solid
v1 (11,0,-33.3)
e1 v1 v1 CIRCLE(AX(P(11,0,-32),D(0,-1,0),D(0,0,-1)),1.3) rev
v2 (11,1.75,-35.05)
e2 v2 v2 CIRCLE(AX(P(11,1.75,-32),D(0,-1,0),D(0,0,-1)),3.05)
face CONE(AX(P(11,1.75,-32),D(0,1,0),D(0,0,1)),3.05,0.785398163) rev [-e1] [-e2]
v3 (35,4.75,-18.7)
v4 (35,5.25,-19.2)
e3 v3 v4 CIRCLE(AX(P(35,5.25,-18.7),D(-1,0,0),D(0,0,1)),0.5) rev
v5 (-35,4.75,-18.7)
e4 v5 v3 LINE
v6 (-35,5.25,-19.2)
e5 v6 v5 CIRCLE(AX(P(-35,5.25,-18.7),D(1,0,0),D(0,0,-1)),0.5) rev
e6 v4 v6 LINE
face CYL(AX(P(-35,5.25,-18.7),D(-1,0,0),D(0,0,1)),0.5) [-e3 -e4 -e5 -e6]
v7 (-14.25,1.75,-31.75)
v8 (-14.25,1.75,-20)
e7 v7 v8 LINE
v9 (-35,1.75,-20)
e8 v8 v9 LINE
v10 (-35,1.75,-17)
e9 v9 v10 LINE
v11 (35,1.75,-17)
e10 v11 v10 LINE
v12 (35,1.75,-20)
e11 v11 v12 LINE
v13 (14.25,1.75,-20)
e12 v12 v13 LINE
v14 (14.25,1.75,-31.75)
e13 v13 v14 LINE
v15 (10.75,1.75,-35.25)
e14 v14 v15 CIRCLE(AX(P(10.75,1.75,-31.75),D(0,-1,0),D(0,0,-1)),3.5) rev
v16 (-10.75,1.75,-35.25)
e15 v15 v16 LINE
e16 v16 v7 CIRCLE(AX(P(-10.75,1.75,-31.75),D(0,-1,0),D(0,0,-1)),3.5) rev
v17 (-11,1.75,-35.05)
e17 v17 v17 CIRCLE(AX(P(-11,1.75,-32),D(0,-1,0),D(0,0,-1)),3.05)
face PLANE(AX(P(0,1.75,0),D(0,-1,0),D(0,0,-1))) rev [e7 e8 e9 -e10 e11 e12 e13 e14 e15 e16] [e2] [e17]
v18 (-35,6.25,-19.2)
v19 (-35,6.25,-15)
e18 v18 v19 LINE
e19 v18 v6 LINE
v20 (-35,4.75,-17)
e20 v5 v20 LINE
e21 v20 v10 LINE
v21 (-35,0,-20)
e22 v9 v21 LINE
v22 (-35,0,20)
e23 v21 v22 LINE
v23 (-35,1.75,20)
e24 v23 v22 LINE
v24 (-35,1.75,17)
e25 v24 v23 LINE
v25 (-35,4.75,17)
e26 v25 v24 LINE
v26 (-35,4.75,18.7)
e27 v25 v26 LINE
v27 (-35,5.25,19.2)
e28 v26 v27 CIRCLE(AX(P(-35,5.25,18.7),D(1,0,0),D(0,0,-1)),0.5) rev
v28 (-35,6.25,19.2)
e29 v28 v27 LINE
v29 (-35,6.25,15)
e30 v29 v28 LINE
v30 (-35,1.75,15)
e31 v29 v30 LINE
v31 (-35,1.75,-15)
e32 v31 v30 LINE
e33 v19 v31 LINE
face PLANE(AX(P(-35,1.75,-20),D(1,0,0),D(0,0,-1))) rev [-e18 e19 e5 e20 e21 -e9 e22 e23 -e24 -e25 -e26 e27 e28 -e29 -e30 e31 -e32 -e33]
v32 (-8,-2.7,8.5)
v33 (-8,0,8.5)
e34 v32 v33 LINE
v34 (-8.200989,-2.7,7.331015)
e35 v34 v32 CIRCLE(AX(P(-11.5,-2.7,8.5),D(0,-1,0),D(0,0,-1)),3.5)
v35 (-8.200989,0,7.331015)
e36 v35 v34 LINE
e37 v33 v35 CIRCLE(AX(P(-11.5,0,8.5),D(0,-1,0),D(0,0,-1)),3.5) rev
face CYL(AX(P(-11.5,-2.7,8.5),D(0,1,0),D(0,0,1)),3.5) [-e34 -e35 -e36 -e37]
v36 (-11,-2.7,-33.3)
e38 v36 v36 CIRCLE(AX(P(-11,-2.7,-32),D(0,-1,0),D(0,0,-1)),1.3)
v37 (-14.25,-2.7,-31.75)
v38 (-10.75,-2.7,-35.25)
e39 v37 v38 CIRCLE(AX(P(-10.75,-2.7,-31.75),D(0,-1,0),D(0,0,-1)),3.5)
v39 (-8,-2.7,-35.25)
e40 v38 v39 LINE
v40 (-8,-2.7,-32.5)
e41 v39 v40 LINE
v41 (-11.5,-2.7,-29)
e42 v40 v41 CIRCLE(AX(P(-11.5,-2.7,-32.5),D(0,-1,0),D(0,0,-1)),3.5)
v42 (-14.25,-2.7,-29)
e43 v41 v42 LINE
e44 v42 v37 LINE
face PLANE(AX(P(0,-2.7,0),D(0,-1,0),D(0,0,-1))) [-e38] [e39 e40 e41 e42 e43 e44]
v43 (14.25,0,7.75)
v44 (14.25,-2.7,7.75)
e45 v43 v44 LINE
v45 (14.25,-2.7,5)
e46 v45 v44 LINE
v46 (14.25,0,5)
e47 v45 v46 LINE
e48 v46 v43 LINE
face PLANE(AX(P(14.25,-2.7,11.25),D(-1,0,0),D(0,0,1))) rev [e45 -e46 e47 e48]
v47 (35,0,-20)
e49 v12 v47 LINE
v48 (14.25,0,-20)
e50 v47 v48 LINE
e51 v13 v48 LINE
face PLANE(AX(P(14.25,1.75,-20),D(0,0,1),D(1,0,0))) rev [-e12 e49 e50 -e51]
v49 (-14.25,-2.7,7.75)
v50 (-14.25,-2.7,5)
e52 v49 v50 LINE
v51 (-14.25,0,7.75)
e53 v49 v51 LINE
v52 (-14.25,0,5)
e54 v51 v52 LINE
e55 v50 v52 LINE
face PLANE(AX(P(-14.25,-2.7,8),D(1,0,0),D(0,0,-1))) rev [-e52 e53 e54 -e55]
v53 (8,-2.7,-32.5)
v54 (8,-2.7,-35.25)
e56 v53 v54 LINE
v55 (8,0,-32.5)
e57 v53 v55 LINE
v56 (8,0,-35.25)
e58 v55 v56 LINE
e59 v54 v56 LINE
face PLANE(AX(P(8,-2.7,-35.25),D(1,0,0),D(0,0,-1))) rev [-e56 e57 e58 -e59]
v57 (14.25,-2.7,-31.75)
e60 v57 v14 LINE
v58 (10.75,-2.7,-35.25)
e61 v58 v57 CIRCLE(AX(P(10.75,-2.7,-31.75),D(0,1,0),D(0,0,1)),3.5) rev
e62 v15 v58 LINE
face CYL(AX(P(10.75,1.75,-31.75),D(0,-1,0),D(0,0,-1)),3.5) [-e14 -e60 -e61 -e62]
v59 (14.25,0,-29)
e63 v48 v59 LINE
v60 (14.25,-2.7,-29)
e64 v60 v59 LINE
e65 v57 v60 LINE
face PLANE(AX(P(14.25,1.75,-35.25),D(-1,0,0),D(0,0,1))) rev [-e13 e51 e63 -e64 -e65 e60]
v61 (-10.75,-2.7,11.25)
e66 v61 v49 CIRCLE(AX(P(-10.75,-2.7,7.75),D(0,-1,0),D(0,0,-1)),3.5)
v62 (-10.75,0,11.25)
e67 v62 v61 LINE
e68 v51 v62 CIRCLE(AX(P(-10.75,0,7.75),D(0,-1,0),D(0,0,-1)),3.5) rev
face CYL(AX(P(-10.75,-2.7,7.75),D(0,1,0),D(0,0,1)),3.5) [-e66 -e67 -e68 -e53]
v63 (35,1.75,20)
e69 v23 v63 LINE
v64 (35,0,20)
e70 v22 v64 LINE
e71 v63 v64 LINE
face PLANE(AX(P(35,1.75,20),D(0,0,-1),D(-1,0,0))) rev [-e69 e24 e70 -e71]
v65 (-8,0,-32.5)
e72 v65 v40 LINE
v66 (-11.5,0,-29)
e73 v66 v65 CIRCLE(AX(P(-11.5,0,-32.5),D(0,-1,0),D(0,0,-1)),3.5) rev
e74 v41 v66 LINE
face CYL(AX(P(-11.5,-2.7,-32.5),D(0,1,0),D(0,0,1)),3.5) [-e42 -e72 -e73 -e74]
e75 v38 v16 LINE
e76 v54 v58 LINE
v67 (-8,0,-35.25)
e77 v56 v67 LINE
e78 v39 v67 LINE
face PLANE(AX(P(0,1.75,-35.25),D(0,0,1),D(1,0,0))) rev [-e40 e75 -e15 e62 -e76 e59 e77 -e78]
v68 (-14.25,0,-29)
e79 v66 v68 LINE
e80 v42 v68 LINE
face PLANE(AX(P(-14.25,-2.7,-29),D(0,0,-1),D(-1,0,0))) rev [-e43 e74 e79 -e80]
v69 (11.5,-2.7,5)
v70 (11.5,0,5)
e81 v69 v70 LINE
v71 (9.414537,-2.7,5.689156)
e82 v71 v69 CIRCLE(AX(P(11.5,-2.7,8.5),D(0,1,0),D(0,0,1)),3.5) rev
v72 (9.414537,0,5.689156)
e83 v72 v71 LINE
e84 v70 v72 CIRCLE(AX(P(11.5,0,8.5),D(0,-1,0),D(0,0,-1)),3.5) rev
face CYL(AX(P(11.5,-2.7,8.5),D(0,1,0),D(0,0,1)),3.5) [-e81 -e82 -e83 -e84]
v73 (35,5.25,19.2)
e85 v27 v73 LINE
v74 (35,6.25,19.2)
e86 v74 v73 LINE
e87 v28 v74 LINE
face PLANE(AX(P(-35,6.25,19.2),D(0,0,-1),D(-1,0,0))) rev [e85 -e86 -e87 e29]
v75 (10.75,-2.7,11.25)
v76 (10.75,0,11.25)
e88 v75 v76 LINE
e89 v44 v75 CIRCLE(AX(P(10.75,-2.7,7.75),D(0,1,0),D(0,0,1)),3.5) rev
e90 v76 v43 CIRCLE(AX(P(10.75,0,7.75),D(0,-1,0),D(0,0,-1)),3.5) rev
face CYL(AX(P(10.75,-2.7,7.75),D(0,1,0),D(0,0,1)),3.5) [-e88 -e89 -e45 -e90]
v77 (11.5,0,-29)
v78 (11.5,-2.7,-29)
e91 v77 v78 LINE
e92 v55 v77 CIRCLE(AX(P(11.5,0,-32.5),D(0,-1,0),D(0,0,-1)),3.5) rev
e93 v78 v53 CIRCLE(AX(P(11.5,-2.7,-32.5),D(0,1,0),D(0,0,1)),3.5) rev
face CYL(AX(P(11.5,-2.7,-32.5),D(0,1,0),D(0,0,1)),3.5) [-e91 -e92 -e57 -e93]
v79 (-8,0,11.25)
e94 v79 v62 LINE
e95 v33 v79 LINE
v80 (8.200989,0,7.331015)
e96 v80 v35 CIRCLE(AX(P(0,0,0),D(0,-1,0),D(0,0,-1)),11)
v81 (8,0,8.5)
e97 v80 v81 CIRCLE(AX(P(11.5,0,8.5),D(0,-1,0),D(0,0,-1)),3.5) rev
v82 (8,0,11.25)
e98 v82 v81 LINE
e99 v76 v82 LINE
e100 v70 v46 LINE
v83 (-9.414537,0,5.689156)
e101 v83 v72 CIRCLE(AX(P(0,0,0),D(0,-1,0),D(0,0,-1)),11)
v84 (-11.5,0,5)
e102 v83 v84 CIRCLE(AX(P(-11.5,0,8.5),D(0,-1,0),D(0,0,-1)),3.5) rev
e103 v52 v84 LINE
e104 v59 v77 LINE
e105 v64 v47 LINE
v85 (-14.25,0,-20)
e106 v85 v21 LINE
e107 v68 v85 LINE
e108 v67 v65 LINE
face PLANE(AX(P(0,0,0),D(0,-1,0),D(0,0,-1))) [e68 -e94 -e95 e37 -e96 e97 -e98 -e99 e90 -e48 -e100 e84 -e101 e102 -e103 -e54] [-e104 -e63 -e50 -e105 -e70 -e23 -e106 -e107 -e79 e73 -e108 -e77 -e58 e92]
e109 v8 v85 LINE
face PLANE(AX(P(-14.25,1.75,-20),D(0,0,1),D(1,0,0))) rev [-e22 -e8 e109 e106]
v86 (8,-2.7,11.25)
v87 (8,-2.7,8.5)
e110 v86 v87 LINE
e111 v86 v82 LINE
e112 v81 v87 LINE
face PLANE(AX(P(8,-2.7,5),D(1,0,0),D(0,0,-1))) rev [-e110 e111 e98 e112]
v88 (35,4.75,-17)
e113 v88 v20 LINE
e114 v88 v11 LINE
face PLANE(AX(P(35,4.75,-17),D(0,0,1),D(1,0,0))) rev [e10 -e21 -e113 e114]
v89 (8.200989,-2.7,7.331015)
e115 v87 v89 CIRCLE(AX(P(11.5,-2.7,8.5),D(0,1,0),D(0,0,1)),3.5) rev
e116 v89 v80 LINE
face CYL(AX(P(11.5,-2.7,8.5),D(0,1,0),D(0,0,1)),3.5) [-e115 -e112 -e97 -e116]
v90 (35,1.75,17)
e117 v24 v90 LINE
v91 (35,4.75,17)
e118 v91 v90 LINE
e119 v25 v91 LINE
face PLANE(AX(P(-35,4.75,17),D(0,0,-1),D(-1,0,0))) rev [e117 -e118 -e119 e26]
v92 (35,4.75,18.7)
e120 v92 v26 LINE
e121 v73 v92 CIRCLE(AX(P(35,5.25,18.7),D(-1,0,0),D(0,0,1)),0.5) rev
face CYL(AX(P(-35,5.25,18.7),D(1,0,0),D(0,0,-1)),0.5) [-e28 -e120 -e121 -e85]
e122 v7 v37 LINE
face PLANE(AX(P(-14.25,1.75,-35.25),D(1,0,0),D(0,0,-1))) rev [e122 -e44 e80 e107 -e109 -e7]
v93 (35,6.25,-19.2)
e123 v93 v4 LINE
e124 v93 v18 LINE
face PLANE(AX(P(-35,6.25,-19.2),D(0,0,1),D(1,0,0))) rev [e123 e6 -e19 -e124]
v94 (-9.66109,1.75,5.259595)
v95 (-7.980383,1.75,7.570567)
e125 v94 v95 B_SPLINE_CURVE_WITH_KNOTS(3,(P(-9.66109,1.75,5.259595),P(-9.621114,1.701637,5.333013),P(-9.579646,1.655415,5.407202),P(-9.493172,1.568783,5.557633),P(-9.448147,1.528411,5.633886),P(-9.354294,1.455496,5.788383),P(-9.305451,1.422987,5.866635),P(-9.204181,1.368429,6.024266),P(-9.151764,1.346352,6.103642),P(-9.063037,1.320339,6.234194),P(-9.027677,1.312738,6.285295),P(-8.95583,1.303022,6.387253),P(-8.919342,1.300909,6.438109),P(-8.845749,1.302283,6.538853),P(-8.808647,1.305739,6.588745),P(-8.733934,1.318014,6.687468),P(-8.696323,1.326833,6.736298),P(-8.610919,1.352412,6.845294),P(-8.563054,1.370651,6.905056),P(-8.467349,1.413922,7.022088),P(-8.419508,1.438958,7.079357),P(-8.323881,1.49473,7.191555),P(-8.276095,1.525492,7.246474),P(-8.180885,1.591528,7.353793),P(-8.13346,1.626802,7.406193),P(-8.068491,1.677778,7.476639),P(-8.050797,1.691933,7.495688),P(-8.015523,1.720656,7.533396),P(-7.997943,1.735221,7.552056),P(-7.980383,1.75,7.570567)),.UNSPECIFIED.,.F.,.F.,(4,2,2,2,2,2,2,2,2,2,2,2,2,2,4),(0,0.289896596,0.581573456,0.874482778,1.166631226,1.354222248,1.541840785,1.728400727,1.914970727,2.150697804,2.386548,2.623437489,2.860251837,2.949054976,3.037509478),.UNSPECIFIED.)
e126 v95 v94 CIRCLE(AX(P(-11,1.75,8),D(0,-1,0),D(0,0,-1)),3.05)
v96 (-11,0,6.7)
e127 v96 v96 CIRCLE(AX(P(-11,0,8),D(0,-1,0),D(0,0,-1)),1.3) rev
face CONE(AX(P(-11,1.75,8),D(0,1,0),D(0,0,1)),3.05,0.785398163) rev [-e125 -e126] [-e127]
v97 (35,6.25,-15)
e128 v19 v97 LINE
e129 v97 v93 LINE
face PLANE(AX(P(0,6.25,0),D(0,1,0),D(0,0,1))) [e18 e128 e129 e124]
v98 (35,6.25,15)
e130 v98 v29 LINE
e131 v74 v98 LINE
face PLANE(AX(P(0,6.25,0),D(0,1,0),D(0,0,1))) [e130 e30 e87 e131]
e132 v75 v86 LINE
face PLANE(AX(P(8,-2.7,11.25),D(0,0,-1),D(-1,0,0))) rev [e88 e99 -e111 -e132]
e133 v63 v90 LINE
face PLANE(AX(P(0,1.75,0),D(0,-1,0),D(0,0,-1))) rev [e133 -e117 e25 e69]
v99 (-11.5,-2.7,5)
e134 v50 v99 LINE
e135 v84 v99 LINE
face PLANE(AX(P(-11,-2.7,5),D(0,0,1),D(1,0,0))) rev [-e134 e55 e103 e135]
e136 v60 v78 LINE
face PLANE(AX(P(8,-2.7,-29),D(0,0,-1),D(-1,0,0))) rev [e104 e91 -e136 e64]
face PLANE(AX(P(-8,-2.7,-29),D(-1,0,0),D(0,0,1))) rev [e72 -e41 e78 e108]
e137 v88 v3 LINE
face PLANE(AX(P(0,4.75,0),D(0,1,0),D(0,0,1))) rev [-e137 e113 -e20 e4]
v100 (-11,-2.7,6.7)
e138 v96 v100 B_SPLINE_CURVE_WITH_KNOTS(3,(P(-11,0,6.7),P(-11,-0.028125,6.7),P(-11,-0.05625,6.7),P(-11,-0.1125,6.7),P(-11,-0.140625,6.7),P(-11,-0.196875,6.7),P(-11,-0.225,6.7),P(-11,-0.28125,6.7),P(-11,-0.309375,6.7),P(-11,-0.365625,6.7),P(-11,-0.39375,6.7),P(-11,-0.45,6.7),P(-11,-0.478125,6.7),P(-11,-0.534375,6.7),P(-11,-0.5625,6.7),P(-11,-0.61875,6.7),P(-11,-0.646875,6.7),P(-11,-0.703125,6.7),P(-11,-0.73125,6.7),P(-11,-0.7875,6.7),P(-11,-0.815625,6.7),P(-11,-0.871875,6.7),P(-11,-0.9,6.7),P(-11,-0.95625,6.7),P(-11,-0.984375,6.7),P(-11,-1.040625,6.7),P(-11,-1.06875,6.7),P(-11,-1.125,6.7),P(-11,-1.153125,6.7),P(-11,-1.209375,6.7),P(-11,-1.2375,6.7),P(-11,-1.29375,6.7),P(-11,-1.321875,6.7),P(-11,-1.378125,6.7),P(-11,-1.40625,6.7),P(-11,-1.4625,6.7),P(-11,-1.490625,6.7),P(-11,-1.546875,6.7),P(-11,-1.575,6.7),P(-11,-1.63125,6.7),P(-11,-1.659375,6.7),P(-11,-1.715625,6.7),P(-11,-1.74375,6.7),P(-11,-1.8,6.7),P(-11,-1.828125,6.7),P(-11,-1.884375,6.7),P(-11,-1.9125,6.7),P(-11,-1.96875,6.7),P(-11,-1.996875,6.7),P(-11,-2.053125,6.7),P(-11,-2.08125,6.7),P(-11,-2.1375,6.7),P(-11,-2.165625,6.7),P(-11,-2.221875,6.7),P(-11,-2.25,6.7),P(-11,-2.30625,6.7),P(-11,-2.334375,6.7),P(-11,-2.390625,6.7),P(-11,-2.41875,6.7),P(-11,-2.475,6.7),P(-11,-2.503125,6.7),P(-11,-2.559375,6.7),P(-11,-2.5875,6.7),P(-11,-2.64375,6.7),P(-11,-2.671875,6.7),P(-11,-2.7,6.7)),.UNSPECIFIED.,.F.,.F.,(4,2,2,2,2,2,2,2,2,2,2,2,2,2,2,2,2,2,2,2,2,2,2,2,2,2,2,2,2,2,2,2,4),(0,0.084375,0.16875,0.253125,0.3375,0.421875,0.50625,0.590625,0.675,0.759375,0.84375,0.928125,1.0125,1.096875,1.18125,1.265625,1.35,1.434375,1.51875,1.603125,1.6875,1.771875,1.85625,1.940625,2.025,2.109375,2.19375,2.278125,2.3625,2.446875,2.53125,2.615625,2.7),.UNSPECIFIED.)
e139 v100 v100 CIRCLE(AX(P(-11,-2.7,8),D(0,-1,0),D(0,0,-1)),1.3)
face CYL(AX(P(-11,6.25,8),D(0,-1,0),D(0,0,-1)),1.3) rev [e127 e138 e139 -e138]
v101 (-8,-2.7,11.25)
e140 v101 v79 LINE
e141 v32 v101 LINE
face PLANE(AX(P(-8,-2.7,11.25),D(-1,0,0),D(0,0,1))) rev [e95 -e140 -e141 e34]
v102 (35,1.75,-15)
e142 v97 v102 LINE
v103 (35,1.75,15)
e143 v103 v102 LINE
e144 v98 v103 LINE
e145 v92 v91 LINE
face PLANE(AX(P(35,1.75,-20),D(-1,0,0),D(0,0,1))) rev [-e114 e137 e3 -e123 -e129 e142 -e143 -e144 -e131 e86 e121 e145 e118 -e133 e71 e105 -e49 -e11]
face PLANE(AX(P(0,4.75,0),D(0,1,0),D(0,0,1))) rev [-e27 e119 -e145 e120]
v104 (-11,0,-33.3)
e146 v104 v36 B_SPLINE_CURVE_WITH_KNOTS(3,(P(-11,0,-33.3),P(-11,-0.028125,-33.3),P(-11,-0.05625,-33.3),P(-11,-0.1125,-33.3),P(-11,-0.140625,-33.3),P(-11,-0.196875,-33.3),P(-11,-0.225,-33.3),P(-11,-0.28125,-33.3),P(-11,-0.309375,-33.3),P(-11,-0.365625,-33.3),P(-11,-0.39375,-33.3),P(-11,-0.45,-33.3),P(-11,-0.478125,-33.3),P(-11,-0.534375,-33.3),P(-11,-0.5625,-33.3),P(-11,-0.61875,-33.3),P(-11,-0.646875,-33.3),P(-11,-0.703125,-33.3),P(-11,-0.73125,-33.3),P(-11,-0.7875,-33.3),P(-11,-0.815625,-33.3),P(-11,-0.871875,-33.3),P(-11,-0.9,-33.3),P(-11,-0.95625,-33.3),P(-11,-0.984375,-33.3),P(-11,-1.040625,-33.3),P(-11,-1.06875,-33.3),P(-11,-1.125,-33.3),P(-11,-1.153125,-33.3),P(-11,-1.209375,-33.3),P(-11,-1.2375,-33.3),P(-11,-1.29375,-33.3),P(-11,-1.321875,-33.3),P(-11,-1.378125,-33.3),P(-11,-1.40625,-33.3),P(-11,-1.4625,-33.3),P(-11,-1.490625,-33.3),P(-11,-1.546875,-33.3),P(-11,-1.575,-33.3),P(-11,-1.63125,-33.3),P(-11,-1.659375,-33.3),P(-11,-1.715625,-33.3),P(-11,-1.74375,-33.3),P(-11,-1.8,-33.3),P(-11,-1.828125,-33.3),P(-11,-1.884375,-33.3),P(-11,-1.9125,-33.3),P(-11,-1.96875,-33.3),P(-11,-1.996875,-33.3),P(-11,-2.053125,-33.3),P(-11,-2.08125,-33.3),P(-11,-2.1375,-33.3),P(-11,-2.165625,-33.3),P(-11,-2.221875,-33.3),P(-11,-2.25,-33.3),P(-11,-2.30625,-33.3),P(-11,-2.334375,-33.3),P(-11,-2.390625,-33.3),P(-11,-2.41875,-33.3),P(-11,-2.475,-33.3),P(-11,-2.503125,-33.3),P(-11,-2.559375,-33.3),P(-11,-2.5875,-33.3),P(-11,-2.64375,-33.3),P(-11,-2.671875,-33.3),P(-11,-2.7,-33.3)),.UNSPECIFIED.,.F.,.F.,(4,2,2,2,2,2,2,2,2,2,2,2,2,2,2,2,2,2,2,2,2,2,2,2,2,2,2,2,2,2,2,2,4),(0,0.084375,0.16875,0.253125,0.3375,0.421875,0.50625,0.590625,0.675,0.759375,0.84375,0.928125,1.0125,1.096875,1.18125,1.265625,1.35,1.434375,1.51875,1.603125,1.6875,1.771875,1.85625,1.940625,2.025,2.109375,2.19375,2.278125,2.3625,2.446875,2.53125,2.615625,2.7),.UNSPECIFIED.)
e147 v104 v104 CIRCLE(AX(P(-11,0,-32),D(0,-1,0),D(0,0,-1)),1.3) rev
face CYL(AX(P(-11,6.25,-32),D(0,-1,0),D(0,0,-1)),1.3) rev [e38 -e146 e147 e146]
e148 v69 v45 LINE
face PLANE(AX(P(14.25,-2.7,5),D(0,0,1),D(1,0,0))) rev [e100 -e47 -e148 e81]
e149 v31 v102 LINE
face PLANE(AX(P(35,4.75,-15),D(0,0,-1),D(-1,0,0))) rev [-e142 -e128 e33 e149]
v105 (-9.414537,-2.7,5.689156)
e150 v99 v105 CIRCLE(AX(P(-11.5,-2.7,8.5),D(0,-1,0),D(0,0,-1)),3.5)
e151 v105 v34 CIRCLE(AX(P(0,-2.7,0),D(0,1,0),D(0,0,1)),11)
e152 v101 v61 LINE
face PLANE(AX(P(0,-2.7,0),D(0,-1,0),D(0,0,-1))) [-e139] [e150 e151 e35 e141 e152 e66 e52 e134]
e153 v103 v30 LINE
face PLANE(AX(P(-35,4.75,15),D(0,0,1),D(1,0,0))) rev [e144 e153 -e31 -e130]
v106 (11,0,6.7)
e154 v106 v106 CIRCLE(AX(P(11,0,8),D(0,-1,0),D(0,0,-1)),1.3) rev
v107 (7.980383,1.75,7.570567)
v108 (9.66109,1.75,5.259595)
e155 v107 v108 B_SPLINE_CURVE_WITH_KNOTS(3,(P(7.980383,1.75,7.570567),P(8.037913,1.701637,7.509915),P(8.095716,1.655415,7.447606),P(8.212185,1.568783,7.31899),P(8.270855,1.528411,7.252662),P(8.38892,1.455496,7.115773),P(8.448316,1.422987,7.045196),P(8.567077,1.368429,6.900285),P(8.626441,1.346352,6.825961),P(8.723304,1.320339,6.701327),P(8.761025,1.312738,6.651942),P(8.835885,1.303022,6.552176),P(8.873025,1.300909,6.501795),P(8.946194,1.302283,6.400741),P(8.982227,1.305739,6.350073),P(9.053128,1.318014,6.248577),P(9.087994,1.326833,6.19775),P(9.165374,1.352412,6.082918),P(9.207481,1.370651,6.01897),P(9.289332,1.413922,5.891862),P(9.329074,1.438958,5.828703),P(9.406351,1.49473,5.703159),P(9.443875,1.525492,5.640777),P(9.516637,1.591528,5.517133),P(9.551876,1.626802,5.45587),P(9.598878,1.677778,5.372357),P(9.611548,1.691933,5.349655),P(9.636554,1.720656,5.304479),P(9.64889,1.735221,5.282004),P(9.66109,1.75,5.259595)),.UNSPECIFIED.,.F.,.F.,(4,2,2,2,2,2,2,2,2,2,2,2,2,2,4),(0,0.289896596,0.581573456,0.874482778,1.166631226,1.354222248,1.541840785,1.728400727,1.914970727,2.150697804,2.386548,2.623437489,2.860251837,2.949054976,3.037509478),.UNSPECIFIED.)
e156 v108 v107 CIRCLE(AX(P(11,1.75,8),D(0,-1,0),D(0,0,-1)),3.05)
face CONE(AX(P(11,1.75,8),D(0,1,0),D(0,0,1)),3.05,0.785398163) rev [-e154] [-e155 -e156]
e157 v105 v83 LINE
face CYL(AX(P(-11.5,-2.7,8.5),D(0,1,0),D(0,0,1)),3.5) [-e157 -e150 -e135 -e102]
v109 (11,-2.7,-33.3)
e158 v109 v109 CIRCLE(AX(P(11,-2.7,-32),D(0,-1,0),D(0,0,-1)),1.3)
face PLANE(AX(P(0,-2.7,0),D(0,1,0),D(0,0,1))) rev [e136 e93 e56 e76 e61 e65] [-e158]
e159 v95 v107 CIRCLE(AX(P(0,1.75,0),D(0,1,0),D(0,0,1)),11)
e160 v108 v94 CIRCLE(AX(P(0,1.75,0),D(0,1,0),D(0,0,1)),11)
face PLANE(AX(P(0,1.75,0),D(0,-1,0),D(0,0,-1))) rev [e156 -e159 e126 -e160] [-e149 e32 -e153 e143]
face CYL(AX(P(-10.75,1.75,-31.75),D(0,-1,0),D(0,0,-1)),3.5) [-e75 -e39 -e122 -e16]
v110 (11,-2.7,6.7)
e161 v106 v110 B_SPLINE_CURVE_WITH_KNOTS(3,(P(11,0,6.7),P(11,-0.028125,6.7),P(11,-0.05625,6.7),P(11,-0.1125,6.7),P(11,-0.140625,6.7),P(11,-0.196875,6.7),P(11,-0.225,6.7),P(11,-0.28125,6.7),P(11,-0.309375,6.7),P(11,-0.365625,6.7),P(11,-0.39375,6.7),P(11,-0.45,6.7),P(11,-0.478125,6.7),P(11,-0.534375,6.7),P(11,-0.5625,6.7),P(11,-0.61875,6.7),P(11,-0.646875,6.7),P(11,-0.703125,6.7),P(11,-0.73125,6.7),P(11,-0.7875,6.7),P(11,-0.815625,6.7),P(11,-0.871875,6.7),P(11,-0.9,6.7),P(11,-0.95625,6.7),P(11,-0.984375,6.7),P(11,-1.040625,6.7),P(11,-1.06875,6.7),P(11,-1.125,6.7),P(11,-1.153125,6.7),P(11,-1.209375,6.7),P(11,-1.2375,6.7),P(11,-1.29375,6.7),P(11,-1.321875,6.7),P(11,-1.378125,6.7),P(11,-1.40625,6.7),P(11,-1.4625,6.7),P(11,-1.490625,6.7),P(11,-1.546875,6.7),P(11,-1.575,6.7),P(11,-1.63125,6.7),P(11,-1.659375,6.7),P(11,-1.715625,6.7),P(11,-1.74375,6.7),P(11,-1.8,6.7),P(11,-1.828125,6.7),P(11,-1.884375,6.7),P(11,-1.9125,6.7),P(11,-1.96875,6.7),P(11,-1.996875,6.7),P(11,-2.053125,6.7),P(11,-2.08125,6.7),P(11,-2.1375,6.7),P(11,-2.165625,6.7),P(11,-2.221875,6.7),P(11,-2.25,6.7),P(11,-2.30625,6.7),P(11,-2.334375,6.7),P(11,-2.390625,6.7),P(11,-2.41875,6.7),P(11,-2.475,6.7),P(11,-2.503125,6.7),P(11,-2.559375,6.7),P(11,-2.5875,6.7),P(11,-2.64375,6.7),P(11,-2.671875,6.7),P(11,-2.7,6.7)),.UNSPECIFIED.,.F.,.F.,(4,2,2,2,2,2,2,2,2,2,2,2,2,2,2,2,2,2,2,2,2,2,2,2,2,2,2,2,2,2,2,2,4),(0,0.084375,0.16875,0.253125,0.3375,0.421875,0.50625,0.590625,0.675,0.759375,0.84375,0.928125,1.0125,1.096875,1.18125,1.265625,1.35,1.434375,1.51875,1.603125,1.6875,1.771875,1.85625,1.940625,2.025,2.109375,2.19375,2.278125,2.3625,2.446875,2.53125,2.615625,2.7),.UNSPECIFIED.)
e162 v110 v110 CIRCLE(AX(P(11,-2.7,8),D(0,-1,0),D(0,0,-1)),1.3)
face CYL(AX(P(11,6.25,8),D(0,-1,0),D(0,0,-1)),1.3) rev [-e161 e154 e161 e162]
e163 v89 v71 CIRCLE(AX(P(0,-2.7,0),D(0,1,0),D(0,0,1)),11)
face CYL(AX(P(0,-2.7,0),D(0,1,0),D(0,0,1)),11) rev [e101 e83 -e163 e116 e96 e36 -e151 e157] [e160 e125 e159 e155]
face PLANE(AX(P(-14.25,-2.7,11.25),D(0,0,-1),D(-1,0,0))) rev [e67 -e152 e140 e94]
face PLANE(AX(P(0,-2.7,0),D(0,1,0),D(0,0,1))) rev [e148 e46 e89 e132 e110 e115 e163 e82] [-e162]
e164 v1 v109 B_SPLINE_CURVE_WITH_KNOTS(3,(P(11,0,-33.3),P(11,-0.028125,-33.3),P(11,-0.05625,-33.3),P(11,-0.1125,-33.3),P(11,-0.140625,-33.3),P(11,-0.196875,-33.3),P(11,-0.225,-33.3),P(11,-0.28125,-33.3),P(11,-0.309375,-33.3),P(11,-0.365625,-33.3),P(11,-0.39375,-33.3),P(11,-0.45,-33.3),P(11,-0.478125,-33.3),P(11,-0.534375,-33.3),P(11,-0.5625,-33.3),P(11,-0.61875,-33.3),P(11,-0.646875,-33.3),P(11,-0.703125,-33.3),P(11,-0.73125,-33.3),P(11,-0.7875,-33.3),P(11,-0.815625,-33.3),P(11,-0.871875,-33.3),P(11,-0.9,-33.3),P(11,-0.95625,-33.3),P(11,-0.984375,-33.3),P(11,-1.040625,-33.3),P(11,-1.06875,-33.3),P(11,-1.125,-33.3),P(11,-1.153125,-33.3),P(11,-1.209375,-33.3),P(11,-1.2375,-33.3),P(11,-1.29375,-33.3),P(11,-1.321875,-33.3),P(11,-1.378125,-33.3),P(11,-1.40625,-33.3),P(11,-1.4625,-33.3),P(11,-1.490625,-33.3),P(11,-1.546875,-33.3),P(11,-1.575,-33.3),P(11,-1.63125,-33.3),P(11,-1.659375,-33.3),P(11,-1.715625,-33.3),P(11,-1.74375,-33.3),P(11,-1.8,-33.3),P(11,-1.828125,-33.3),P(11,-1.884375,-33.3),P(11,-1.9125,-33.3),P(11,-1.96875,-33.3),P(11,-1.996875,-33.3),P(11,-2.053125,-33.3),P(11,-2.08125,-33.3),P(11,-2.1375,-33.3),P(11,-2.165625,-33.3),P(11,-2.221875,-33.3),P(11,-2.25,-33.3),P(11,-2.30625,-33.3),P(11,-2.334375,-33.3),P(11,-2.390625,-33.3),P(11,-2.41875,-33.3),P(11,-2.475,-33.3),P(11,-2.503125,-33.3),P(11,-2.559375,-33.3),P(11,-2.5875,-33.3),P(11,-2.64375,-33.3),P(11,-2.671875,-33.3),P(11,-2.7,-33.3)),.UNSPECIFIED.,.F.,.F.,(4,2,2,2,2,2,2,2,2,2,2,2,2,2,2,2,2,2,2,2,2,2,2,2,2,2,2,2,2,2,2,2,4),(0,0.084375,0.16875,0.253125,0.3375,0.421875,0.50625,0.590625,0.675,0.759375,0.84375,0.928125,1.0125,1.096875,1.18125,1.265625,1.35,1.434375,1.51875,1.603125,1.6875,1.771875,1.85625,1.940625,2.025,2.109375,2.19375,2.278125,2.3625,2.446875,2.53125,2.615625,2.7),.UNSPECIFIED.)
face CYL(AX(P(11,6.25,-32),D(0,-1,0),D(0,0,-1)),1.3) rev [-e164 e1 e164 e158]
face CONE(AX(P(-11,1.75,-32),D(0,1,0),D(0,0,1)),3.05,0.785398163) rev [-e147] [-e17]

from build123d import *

# Parameters (mm, degrees)
BOSS_EXTRUDE1_DEPTH = 1.75
SKETCH2_W           = 70
SKETCH2_H           = 2
BOSS_EXTRUDE2_DEPTH = 3
SKETCH3_W           = 70
SKETCH3_H           = 4.2
BOSS_EXTRUDE3_DEPTH = 1.5
SKETCH4_W           = 6.25
SKETCH4_H           = 6.25
BOSS_EXTRUDE4_DEPTH = 2.7
SKETCH6_R           = 1.3
CUT_EXTRUDE2_DEPTH  = 51.474399452
FILLET3_R           = 3.5
SKETCH7_R           = 11
CUT_EXTRUDE3_DEPTH  = 50.877976102
CHAMFER1_SIZE       = 1.75
FILLET4_R           = 0.5


with BuildPart() as part:
    # Sketch1 → Boss-Extrude1 (new body)
    with BuildSketch(Plane(origin=(0, 0, 0), x_dir=(1, 0, 0), z_dir=(0, 1, 0))):
        Polygon((35, 20), (35, -20), (-35, -20), (-35, 20), (-14.25, 20), (-14.25, 35.25), (0, 35.25), (14.25, 35.25), (14.25, 20), align=None)
    extrude(amount=BOSS_EXTRUDE1_DEPTH)

    # Sketch2 → Boss-Extrude2 (add)
    with BuildSketch(Plane(origin=(0, 1.75, 0), x_dir=(1, 0, 0), z_dir=(0, 1, 0))):
        with Locations((0, 16)):
            Rectangle(SKETCH2_W, SKETCH2_H)
        with Locations((0, -16)):
            Rectangle(SKETCH2_W, SKETCH2_H)
    extrude(amount=BOSS_EXTRUDE2_DEPTH)

    # Sketch3 → Boss-Extrude3 (add)
    with BuildSketch(Plane(origin=(0, 4.75, 0), x_dir=(1, 0, 0), z_dir=(0, 1, 0))):
        with Locations((0, 17.1)):
            Rectangle(SKETCH3_W, SKETCH3_H)
        with Locations((0, -17.1)):
            Rectangle(SKETCH3_W, SKETCH3_H)
    extrude(amount=BOSS_EXTRUDE3_DEPTH)

    # Sketch4 → Boss-Extrude4 (add)
    with BuildSketch(Plane.XZ):
        Polygon((-11, -35.25), (-8, -35.25), (-8, -32), (-8, -29), (-11, -29), (-14.25, -29), (-14.25, -32), (-14.25, -35.25), align=None)
        with Locations((11.125, -32.125)):
            Rectangle(SKETCH4_W, SKETCH4_H)
        Polygon((14.25, 8), (14.25, 5), (8, 5), (8, 8.25), (8, 11.25), (14.25, 11.25), align=None)
        Polygon((-14.25, 11.25), (-8, 11.25), (-8, 8.25), (-8, 5), (-11, 5), (-14.25, 5), (-14.25, 8), align=None)
    extrude(amount=BOSS_EXTRUDE4_DEPTH)

    # Sketch6 → Cut-Extrude2 (cut, through all)
    with BuildSketch(Plane.XZ.offset(2.7)):
        with Locations(Location((-11, -32, 0), (0, 0, 270))):
            Circle(SKETCH6_R)
        with Locations(Location((11, -32, 0), (0, 0, 270))):
            Circle(SKETCH6_R)
        with Locations(Location((-11, 8, 0), (0, 0, 270))):
            Circle(SKETCH6_R)
        with Locations(Location((11, 8, 0), (0, 0, 270))):
            Circle(SKETCH6_R)
    extrude(amount=-CUT_EXTRUDE2_DEPTH, mode=Mode.SUBTRACT)

    # Fillet3
    fillet3_edges = [part.edges().sort_by_distance(p)[0] for p in [
        (-8, -1.35, 5),
        (-14.25, -1.35, 11.25),
        (8, -1.35, 5),
        (14.25, -1.35, 11.25),
        (-14.25, -0.475, -35.25),
        (14.25, -0.475, -35.25),
        (8, -1.35, -29),
        (-8, -1.35, -29),
    ]]
    fillet(fillet3_edges, radius=FILLET3_R)

    # Sketch7 → Cut-Extrude3 (cut, through all)
    with BuildSketch(Plane(origin=(0, 1.75, 0), x_dir=(1, 0, 0), z_dir=(0, 1, 0))):
        with Locations(Location((0, 0, 0), (0, 0, 270))):
            Circle(SKETCH7_R)
    extrude(amount=-CUT_EXTRUDE3_DEPTH, mode=Mode.SUBTRACT)

    # Chamfer1
    # the kernel refuses this chamfer: 1.75 mm, written as the material it takes off along each edge
    with BuildSketch(Plane(origin=(11, 1.75, -32), x_dir=(0, 0, -1), z_dir=(-1, 0, 0))) as chamfer1_piece_1:
        Polygon((1.3 + CHAMFER1_SIZE, 0), (1.3, CHAMFER1_SIZE), (1.3, 0), align=None)
    revolve(axis=Axis((11, 1.75, -32), (0, -1, 0)), mode=Mode.SUBTRACT)
    with BuildSketch(Plane(origin=(-11, 1.75, 8), x_dir=(0, 0, -1), z_dir=(-1, 0, 0))) as chamfer1_piece_2:
        Polygon((1.3 + CHAMFER1_SIZE, 0), (1.3, CHAMFER1_SIZE), (1.3, 0), align=None)
    revolve(axis=Axis((-11, 1.75, 8), (0, -1, 0)), mode=Mode.SUBTRACT)
    with BuildSketch(Plane(origin=(11, 1.75, 8), x_dir=(0, 0, -1), z_dir=(-1, 0, 0))) as chamfer1_piece_3:
        Polygon((1.3 + CHAMFER1_SIZE, 0), (1.3, CHAMFER1_SIZE), (1.3, 0), align=None)
    revolve(axis=Axis((11, 1.75, 8), (0, -1, 0)), mode=Mode.SUBTRACT)
    with BuildSketch(Plane(origin=(-11, 1.75, -32), x_dir=(0, 0, -1), z_dir=(-1, 0, 0))) as chamfer1_piece_4:
        Polygon((1.3 + CHAMFER1_SIZE, 0), (1.3, CHAMFER1_SIZE), (1.3, 0), align=None)
    revolve(axis=Axis((-11, 1.75, -32), (0, -1, 0)), mode=Mode.SUBTRACT)

    # Fillet4
    fillet4_edges = [part.edges().sort_by_distance(p)[0] for p in [
        (0, 4.75, -19.2),
        (0, 4.75, 19.2),
    ]]
    fillet(fillet4_edges, radius=FILLET4_R)


solid = part.part
